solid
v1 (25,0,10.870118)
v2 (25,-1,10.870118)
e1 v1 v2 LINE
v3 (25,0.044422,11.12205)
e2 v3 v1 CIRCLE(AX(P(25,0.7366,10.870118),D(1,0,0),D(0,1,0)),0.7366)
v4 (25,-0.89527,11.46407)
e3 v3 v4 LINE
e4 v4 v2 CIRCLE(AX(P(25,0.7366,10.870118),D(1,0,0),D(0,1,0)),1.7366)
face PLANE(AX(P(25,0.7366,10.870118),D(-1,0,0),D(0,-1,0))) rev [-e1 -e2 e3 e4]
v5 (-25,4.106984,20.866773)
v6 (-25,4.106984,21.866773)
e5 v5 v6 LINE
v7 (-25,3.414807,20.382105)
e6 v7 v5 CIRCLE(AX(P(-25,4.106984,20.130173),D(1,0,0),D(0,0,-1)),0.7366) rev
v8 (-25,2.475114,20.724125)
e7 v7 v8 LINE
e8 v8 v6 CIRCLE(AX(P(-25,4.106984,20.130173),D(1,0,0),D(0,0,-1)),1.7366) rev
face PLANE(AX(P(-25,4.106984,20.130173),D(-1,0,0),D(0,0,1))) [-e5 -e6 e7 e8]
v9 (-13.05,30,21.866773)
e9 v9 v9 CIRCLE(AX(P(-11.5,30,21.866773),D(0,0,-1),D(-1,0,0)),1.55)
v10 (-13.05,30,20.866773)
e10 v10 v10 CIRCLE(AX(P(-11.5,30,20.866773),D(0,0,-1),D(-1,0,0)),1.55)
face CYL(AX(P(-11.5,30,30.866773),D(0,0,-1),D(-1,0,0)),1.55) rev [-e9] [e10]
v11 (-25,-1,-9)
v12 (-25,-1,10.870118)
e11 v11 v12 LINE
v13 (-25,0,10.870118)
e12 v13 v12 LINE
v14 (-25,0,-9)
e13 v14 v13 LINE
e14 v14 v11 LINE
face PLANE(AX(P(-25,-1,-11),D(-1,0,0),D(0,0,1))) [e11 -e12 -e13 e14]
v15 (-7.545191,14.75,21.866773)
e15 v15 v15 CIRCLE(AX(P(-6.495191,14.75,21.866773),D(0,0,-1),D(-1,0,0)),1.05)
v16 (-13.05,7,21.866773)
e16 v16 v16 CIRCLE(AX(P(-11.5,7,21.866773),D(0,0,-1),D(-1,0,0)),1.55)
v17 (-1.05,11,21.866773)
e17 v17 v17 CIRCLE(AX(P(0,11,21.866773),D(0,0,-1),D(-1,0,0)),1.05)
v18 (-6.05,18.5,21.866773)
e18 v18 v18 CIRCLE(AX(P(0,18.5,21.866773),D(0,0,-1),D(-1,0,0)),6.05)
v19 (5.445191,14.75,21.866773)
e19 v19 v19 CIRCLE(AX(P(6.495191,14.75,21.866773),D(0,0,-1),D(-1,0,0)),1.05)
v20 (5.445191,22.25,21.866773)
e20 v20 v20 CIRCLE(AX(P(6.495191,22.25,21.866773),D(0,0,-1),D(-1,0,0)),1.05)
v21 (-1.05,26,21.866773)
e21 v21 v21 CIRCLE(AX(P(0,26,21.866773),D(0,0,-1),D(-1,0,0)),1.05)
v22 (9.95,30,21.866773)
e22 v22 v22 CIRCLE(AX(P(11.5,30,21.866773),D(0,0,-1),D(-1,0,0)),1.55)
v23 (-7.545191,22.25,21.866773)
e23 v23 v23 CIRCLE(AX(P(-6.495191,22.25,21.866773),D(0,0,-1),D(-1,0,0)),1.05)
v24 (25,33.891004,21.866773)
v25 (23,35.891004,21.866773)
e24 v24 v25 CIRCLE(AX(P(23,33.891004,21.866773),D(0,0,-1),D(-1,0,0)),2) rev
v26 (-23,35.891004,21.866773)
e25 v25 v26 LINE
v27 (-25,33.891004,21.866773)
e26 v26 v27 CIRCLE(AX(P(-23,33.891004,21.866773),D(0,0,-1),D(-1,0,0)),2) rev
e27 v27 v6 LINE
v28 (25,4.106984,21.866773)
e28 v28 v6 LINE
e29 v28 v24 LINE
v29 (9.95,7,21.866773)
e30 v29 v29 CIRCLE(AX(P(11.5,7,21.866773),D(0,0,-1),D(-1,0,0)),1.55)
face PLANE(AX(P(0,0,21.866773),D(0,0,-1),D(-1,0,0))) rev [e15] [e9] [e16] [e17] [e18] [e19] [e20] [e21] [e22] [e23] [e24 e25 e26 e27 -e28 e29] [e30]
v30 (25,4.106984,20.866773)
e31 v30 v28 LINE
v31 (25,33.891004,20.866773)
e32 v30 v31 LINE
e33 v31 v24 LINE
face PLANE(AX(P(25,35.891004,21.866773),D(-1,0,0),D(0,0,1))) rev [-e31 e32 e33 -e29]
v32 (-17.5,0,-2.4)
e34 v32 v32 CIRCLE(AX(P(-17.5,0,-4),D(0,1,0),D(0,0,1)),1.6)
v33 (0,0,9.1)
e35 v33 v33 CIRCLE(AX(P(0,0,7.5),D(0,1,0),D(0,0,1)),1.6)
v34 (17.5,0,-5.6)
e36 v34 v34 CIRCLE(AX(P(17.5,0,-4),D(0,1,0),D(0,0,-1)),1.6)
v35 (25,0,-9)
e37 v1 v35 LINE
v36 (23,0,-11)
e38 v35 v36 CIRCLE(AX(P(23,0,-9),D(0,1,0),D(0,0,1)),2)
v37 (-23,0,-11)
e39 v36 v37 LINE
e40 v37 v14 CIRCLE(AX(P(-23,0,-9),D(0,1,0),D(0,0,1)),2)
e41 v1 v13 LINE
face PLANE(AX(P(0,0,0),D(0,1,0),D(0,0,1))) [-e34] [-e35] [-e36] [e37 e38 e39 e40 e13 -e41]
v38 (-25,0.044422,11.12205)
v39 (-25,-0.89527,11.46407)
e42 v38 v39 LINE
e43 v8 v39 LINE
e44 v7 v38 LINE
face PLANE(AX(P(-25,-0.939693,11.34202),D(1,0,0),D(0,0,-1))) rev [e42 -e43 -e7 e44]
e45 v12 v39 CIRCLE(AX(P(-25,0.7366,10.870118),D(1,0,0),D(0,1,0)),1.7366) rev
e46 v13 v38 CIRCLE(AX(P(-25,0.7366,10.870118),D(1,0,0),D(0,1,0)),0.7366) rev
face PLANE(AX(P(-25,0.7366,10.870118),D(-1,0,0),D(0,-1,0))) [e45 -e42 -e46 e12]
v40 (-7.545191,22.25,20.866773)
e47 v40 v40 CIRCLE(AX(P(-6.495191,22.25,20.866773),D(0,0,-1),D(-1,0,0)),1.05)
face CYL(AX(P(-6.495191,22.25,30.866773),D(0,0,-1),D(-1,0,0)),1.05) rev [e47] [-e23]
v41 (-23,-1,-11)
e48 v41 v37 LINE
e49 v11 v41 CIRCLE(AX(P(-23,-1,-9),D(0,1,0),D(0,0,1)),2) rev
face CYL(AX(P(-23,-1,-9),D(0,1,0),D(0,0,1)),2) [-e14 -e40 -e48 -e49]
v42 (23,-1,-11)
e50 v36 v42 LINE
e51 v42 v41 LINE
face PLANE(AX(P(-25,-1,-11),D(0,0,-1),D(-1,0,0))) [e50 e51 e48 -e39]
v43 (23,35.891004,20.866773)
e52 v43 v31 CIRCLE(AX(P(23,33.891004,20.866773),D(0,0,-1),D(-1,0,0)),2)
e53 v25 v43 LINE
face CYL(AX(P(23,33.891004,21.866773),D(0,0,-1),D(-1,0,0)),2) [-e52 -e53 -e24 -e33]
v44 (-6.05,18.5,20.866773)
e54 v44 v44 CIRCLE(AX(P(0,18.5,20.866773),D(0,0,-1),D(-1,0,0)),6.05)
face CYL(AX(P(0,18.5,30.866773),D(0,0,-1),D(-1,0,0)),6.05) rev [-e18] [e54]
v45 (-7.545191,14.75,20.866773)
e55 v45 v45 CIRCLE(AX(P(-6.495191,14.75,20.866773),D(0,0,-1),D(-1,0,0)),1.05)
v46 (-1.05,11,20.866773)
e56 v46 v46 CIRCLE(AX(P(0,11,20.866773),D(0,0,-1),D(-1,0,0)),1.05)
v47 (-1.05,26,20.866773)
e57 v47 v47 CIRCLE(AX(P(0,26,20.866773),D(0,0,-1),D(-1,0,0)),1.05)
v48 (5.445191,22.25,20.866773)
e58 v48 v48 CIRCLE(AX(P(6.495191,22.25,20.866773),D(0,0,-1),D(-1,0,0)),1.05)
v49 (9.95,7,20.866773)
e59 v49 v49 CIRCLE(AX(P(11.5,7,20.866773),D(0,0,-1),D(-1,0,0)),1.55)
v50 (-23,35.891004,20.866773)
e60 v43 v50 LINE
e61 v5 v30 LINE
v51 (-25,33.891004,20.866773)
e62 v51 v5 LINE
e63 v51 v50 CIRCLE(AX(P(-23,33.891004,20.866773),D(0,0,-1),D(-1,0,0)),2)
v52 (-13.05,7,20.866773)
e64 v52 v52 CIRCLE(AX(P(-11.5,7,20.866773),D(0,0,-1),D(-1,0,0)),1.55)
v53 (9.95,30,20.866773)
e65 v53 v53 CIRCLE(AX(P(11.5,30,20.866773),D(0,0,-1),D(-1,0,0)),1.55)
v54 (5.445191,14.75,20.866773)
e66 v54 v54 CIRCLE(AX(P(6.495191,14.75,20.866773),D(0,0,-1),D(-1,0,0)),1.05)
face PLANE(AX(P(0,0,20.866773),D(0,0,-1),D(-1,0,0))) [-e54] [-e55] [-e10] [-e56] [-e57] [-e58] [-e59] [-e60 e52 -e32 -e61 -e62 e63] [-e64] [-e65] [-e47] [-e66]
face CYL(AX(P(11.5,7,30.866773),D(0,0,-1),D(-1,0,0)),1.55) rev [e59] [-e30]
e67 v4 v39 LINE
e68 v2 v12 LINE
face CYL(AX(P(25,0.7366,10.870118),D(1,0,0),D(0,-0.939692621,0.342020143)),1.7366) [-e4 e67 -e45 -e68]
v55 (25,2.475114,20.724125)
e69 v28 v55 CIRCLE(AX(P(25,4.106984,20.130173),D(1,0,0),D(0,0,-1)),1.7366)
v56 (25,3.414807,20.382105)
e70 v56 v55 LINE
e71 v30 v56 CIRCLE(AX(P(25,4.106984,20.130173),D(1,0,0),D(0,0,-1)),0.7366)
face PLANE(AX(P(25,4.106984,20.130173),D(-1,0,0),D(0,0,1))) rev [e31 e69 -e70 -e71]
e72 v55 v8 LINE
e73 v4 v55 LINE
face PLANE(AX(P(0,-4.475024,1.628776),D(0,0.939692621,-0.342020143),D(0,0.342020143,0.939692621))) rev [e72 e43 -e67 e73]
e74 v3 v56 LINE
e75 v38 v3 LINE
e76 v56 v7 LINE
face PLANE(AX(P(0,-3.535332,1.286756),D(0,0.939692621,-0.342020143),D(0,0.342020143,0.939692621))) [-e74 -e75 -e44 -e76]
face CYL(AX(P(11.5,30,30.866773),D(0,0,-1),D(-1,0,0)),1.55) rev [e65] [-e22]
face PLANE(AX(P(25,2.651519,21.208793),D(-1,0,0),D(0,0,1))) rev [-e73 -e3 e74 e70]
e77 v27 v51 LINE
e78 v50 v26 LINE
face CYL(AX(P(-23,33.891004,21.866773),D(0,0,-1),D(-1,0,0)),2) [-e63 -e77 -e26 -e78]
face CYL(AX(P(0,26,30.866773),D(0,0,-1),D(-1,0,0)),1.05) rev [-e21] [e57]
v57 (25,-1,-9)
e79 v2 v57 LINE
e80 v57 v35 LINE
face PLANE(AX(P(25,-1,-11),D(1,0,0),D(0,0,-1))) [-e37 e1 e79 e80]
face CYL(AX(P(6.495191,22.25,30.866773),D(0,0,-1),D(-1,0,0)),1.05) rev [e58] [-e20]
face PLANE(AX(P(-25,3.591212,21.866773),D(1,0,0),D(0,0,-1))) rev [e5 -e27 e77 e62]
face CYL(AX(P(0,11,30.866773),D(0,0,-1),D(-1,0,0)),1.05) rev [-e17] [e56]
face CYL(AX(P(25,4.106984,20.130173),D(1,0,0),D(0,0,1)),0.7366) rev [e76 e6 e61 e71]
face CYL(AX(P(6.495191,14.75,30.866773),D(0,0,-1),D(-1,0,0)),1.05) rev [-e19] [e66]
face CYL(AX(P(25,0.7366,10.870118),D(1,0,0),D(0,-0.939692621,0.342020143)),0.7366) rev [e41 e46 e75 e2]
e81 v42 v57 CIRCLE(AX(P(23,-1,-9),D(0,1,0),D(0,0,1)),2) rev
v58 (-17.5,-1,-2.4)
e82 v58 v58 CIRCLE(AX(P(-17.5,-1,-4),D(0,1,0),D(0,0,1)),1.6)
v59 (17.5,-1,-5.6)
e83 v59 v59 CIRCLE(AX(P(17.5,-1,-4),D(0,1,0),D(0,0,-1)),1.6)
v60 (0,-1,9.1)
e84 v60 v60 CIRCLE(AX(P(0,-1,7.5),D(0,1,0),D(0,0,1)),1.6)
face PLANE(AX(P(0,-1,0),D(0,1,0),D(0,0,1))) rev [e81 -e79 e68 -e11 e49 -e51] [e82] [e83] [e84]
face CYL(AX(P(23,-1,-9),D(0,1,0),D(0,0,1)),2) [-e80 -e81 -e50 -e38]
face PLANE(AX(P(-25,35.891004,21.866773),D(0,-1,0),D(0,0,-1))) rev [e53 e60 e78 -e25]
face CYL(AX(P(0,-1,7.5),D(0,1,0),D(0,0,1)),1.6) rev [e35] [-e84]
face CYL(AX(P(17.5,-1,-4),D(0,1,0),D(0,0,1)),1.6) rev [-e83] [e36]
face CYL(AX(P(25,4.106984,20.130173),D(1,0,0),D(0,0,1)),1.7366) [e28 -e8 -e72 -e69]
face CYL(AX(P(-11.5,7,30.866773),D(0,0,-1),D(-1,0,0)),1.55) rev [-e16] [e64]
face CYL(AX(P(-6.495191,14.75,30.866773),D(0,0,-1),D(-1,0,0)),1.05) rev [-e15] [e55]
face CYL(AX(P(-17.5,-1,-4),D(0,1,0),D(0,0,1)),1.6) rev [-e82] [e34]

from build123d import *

# Parameters (mm, degrees)
SKETCH_1_W                       = 50
SKETCH_1_H                       = 22
SKETCH_1_R                       = 1.6
SM_BASE_FLANGE_1_DEPTH           = 1
SM_EDGE_FLANGE_5_STRIP_CUT_DEPTH = 50
SM_EDGE_FLANGE_5_DEPTH           = 50
SM_EDGE_FLANGE_4_STRIP_CUT_DEPTH = 50
SM_EDGE_FLANGE_4_DEPTH           = 50
SKETCH_9_R                       = 1.55
SKETCH_9_R_2                     = 1.05
SKETCH_9_R_3                     = 6.05
SKETCH_9_R_4                     = 4.1
CUT_EXTRUDE_1_DEPTH              = 10
FILLET_1_R                       = 2


# Sheet-metal steps are written as plain solids
with BuildPart() as part:
    # Sketch 1 → 基体-法兰1 (new body)
    with BuildSketch(Plane(origin=(0, 0, 0), x_dir=(1, 0, 0), z_dir=(0, 1, 0))):
        Rectangle(SKETCH_1_W, SKETCH_1_H)
        with Locations(Location((0, -7.5, 0), (0, 0, 270))):
            Circle(SKETCH_1_R, mode=Mode.SUBTRACT)
        with Locations(Location((-17.5, 4, 0), (0, 0, 270))):
            Circle(SKETCH_1_R, mode=Mode.SUBTRACT)
        with Locations(Location((17.5, 4, 0), (0, 0, 90))):
            Circle(SKETCH_1_R, mode=Mode.SUBTRACT)
    extrude(amount=-SM_BASE_FLANGE_1_DEPTH)

    # 边线-法兰5 strip (across the edge) → 边线-法兰5 strip cut (cut)
    with BuildSketch(Plane(origin=(-25, 0, 11), x_dir=(0, 0.9396926207859105, -0.3420201433256631), z_dir=(1, 0, 0))):
        Polygon((-2.767214854, 4.679055925), (-0.895270205, -0.464069727), (0.044422416, -0.122049584), (-1.827522233, 5.021076069), align=None)
    extrude(amount=SM_EDGE_FLANGE_5_STRIP_CUT_DEPTH, mode=Mode.SUBTRACT)

    # 边线-法兰5 section (across the edge) → 边线-法兰5 (add)
    with BuildSketch(Plane(origin=(-25, 0, 11), x_dir=(0, 0.9396926207859105, -0.3420201433256631), z_dir=(1, 0, 0))):
        with BuildLine():
            Line((-1, 0.129882454), (-1, 10.5))
            Line((-1, 10.5), (0, 10.5))
            Line((0, 10.5), (0, 0.129882454))
            ThreePointArc((0, 0.129882454), (0.011190609, 0.001973206), (0.044422416, -0.122049584))
            Line((0.044422416, -0.122049584), (-0.895270205, -0.464069727))
            ThreePointArc((-0.895270205, -0.464069727), (-0.973617144, -0.171674971), (-1, 0.129882454))
        make_face()
    extrude(amount=SM_EDGE_FLANGE_5_DEPTH)

    # 边线-法兰4 strip (across the edge) → 边线-法兰4 strip cut (cut)
    with BuildSketch(Plane(origin=(-25, 3.591211505, 20.866772518), x_dir=(0, 0, -1), z_dir=(1, 0, 0))):
        Polygon((-5.000477833, 0.755847316), (0.142647819, -1.116097333), (0.484667962, -0.176404712), (-4.65845769, 1.695539937), align=None)
    extrude(amount=SM_EDGE_FLANGE_4_STRIP_CUT_DEPTH, mode=Mode.SUBTRACT)

    # 边线-法兰4 section (across the edge) → 边线-法兰4 (add)
    with BuildSketch(Plane(origin=(-25, 3.591211505, 20.866772518), x_dir=(0, 0, -1), z_dir=(1, 0, 0))):
        with BuildLine():
            Line((-1, 0.515772873), (-1, 32.299792462))
            Line((-1, 32.299792462), (0, 32.299792462))
            Line((0, 32.299792462), (0, 0.515772873))
            ThreePointArc((0, 0.515772873), (0.133212604, 0.09327647), (0.484667962, -0.176404712))
            Line((0.484667962, -0.176404712), (0.142647819, -1.116097333))
            ThreePointArc((0.142647819, -1.116097333), (-0.68593944, -0.480299967), (-1, 0.515772873))
        make_face()
    extrude(amount=SM_EDGE_FLANGE_4_DEPTH)

    # 草图9 → 切除-拉伸1 (cut)
    # profile 1 of 12: a face of its own
    with BuildSketch(Plane(origin=(0, 0, 20.866772518), x_dir=(-1, 0, 0), z_dir=(0, 0, -1))):
        with Locations((-11.5, 30)):
            Circle(SKETCH_9_R)
    # profile 2 of 12: a face of its own
    with BuildSketch(Plane(origin=(0, 0, 20.866772518), x_dir=(-1, 0, 0), z_dir=(0, 0, -1))):
        with Locations((11.5, 30)):
            Circle(SKETCH_9_R)
    # profile 3 of 12: a face of its own
    with BuildSketch(Plane(origin=(0, 0, 20.866772518), x_dir=(-1, 0, 0), z_dir=(0, 0, -1))):
        with Locations((6.495190528, 22.25)):
            Circle(SKETCH_9_R_2)
    # profile 4 of 12: a face of its own
    with BuildSketch(Plane(origin=(0, 0, 20.866772518), x_dir=(-1, 0, 0), z_dir=(0, 0, -1))):
        with Locations((0, 26)):
            Circle(SKETCH_9_R_2)
    # profile 5 of 12: a face of its own
    with BuildSketch(Plane(origin=(0, 0, 20.866772518), x_dir=(-1, 0, 0), z_dir=(0, 0, -1))):
        with Locations((-6.495190528, 22.25)):
            Circle(SKETCH_9_R_2)
    # profile 6 of 12: a face of its own
    with BuildSketch(Plane(origin=(0, 0, 20.866772518), x_dir=(-1, 0, 0), z_dir=(0, 0, -1))):
        with Locations((-6.495190528, 14.75)):
            Circle(SKETCH_9_R_2)
    # profile 7 of 12: a face of its own
    with BuildSketch(Plane(origin=(0, 0, 20.866772518), x_dir=(-1, 0, 0), z_dir=(0, 0, -1))):
        with Locations((0, 11)):
            Circle(SKETCH_9_R_2)
    # profile 8 of 12: a face of its own
    with BuildSketch(Plane(origin=(0, 0, 20.866772518), x_dir=(-1, 0, 0), z_dir=(0, 0, -1))):
        with Locations((6.495190528, 14.75)):
            Circle(SKETCH_9_R_2)
    # profile 9 of 12: a face of its own
    with BuildSketch(Plane(origin=(0, 0, 20.866772518), x_dir=(-1, 0, 0), z_dir=(0, 0, -1))):
        with Locations((0, 18.5)):
            Circle(SKETCH_9_R_3)
        with Locations((0, 18.5)):
            Circle(SKETCH_9_R_4, mode=Mode.SUBTRACT)
    # profile 10 of 12: a face of its own
    with BuildSketch(Plane(origin=(0, 0, 20.866772518), x_dir=(-1, 0, 0), z_dir=(0, 0, -1))):
        with Locations((0, 18.5)):
            Circle(SKETCH_9_R_4)
    # profile 11 of 12: a face of its own
    with BuildSketch(Plane(origin=(0, 0, 20.866772518), x_dir=(-1, 0, 0), z_dir=(0, 0, -1))):
        with Locations((11.5, 7)):
            Circle(SKETCH_9_R)
    # profile 12 of 12: a face of its own
    with BuildSketch(Plane(origin=(0, 0, 20.866772518), x_dir=(-1, 0, 0), z_dir=(0, 0, -1))):
        with Locations((-11.5, 7)):
            Circle(SKETCH_9_R)
    extrude(amount=-CUT_EXTRUDE_1_DEPTH, mode=Mode.SUBTRACT)

    # 圆角1
    fillet_1_edges = [part.edges().sort_by_distance(p)[0] for p in [
        (-25, 35.891003967, 21.366772518),
        (-25, -0.5, -11),
        (25, -0.5, -11),
        (25, 35.891003967, 21.366772518),
    ]]
    fillet(fillet_1_edges, radius=FILLET_1_R)


solid = part.part
